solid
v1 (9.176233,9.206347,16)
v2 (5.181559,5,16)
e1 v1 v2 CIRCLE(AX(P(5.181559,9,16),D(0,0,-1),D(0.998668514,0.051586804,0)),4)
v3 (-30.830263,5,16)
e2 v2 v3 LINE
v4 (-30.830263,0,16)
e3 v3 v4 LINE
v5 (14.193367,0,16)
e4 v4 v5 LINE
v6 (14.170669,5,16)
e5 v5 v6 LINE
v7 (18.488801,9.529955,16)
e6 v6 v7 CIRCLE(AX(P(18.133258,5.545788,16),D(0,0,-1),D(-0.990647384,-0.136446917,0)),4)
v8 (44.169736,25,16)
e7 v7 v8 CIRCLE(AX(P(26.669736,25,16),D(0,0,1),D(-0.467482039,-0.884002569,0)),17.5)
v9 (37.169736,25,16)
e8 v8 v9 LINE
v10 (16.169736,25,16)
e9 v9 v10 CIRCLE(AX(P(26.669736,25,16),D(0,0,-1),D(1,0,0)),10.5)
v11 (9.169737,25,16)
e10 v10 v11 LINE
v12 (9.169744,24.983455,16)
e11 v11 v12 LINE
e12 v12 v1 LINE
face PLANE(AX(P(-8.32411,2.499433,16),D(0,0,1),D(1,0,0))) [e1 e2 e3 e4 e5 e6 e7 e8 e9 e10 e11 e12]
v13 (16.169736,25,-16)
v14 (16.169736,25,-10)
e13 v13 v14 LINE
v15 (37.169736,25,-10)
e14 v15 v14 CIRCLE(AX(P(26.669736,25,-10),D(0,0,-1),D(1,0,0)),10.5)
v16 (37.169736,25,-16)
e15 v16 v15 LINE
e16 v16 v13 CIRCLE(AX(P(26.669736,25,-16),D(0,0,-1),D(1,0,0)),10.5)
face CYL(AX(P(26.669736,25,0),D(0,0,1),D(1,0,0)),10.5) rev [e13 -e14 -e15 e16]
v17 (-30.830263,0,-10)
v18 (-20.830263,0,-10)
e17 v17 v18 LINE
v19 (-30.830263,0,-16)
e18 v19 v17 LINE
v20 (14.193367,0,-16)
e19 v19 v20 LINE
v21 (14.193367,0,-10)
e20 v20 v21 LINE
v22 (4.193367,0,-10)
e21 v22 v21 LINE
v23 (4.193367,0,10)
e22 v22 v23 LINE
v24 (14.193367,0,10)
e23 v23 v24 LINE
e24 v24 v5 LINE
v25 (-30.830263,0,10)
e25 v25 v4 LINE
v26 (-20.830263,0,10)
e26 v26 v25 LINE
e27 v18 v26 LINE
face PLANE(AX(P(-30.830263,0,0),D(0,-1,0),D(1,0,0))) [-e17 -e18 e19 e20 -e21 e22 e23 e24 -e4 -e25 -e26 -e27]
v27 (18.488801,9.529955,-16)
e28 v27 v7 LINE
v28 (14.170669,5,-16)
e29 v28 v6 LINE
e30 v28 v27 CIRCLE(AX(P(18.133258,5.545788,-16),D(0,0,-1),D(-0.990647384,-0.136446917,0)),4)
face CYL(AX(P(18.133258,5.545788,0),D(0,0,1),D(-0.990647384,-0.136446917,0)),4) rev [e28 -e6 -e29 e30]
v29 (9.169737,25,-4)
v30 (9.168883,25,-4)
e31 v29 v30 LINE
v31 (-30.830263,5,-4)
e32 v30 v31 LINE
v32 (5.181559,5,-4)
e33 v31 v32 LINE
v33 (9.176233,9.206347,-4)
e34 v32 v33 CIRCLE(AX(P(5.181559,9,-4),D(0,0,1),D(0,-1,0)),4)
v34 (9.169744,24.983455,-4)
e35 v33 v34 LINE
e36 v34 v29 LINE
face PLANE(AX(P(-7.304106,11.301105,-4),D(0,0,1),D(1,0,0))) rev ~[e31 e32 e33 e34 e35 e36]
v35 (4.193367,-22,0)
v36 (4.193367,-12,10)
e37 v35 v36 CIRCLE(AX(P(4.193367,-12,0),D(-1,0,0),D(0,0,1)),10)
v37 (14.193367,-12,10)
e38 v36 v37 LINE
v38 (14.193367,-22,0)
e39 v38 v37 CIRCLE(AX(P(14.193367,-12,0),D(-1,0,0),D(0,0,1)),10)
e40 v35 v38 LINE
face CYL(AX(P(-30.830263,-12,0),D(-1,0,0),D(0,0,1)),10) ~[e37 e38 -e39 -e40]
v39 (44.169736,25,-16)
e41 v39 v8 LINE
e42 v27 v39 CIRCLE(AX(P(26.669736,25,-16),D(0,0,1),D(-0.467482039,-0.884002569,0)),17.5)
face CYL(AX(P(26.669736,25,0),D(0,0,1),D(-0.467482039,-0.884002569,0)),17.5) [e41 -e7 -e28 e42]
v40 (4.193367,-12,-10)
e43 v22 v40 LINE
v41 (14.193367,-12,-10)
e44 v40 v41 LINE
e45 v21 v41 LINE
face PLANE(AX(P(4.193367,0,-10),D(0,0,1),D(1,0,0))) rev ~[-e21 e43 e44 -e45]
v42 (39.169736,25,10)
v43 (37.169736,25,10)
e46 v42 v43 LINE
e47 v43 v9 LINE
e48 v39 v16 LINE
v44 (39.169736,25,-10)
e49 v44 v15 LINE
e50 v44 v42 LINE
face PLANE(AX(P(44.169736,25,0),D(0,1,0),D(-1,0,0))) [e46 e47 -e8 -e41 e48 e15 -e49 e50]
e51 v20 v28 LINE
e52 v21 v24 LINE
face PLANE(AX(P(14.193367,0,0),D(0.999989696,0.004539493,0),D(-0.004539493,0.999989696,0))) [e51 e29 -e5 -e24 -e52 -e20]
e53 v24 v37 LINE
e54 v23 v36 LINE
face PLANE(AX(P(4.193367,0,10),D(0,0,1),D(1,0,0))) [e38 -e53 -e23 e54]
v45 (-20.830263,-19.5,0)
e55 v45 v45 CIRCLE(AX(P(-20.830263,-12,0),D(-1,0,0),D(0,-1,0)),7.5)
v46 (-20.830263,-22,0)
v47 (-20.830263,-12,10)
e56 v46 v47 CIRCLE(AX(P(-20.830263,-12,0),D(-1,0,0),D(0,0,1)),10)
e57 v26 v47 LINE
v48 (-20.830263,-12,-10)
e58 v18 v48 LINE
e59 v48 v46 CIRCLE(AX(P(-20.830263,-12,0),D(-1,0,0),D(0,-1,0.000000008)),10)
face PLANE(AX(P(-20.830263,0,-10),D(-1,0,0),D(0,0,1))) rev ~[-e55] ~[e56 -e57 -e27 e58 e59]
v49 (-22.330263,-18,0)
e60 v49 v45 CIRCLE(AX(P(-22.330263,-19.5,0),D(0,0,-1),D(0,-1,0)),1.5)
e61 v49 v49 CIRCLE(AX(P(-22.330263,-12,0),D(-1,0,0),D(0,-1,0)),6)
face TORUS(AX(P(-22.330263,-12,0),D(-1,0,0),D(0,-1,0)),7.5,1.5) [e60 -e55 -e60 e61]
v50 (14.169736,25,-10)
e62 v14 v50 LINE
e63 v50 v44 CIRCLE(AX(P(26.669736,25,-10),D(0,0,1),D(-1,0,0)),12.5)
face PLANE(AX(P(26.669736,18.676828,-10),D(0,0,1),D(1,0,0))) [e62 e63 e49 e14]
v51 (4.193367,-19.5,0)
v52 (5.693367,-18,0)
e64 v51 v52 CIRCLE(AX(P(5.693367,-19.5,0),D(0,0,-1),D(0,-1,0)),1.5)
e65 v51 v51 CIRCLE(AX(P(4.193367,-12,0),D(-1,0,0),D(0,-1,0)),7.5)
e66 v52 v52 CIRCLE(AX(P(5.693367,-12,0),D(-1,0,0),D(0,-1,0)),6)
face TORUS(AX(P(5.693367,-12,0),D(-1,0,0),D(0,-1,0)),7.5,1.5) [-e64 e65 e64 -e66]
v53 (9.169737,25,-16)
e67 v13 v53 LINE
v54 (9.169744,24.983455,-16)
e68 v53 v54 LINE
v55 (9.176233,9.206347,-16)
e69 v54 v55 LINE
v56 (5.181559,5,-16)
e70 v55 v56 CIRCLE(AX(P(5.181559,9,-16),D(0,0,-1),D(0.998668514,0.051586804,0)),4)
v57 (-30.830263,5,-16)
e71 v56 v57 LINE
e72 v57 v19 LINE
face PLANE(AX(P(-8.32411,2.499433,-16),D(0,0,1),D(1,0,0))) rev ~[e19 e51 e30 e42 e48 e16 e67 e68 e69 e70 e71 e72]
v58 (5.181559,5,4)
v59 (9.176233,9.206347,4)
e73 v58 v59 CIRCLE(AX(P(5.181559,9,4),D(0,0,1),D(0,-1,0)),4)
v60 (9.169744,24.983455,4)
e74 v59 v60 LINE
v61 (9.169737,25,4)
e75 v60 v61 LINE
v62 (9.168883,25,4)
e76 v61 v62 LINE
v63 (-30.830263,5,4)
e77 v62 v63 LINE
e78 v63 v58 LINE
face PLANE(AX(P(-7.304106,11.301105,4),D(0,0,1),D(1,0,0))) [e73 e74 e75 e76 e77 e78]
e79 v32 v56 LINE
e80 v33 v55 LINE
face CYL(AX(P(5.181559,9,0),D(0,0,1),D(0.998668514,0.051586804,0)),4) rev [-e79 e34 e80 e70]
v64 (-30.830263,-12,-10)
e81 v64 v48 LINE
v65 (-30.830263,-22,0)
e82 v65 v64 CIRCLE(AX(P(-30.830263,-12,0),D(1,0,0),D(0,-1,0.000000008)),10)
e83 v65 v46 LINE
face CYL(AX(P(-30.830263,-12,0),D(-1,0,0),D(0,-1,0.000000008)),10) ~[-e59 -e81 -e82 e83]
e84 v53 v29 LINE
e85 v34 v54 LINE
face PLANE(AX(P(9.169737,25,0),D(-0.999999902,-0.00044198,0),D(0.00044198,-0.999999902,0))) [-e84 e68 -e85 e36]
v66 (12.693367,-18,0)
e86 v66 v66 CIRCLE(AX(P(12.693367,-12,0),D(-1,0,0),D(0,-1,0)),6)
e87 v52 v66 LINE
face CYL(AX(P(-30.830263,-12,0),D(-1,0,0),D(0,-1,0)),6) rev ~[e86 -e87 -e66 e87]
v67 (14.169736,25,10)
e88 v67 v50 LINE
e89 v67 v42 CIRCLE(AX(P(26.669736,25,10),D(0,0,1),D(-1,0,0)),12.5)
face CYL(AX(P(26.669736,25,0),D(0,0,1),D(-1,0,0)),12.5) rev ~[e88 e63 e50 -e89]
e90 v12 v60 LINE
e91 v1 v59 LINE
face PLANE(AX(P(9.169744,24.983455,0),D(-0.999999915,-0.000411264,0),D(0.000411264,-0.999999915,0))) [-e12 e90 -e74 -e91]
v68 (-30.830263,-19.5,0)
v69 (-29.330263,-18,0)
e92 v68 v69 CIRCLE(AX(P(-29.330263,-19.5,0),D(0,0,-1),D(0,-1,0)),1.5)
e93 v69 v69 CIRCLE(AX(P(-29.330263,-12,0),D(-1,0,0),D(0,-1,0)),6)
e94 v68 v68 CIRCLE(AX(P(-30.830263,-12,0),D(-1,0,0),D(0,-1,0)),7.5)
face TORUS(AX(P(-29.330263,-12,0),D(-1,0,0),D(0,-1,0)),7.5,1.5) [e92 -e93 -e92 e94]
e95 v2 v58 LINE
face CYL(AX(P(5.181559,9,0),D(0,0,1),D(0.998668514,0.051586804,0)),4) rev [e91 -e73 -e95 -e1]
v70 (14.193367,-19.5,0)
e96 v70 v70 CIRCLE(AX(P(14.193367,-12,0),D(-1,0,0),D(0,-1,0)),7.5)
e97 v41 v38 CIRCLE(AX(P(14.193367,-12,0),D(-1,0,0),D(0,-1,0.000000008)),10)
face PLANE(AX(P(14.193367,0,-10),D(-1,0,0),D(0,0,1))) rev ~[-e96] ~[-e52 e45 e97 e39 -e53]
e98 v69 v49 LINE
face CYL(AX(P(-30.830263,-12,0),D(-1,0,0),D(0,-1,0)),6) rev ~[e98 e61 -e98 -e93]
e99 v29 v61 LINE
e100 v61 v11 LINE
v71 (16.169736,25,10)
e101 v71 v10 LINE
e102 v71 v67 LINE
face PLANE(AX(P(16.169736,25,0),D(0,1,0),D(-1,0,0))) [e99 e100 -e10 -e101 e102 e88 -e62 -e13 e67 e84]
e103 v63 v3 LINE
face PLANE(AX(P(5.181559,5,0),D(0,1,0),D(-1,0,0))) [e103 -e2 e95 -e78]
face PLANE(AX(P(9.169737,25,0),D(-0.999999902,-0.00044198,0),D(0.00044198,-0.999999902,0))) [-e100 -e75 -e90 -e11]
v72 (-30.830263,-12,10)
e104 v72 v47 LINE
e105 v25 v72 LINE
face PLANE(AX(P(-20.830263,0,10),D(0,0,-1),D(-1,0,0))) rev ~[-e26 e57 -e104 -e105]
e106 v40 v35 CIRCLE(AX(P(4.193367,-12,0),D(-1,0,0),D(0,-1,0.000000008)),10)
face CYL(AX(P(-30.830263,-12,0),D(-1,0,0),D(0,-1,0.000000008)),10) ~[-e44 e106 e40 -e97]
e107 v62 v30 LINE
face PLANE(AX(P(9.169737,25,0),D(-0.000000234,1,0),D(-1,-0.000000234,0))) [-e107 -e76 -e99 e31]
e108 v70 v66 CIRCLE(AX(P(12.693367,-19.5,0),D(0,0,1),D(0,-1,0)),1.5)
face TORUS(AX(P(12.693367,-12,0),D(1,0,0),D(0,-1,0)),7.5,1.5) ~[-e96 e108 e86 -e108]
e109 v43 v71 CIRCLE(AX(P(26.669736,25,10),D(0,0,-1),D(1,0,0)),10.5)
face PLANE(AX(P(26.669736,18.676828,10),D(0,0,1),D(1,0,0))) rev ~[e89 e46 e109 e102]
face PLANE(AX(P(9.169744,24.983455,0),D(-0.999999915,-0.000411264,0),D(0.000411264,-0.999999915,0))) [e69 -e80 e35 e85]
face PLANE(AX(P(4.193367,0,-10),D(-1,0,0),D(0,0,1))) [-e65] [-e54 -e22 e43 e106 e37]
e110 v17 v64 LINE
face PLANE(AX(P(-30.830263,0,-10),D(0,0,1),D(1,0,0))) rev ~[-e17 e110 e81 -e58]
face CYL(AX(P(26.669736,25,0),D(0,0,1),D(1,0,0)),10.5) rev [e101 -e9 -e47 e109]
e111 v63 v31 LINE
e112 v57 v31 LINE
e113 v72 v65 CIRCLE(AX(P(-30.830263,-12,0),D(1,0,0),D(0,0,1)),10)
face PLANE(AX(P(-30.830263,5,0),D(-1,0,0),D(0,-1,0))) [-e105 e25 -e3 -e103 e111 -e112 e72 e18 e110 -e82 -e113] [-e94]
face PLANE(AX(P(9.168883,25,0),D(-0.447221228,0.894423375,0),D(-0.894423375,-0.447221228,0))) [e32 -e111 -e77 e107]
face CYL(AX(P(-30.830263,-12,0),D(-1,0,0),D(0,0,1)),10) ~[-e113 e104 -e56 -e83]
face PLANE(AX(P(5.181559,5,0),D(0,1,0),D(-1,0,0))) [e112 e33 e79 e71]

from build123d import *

# Parameters (mm, degrees)
F1_DEPTH = 16
F2_DEPTH = 4
F3_DEPTH = 10
F4_W     = 10
F4_H     = 20
F5_DEPTH = 22
F6_R     = 6
F7_DEPTH = 75.0009999306
F8_R     = 1.5


# Not quite as in the source:
# - ends of sketch curves that miss each other by under 0.0002 mm in the source are joined


with BuildPart() as f1:
    # F0 (on Top) → F1 (new body, symmetric)
    with BuildSketch(Plane.XY):
        Polygon((14.1706688348, 5), (5.1815587922, 5), (-30.8302634659, 5), (-30.8302634659, 0), (14.1933665337, 0), align=None)
        with BuildLine():
            ThreePointArc((9.1762328499, 9.2063472144), (8.0820233117, 6.2454935885), (5.1815587922, 5))
            Line((5.1815587922, 5), (14.1706688348, 5))
            ThreePointArc((14.1706688348, 5), (15.2379483, 8.3057115079), (18.4888007758, 9.5299550339))
            ThreePointArc((18.4888007758, 9.5299550339), (35.6997870029, 10.0097302467), (44.1697364647, 25))
            Line((44.1697364647, 25), (39.1697364647, 25))
            ThreePointArc((39.1697364647, 25), (26.6697364647, 12.5), (14.1697364647, 25))
            Line((14.1697364647, 25), (9.169736973, 25))
            Line((9.169736973, 25), (9.1697442854, 24.9834553538))
            Line((9.1697442854, 24.9834553538), (9.1762328499, 9.2063472144))
        make_face()
        with BuildLine():
            Line((14.1706688348, 25), (14.1697364647, 25))
            ThreePointArc((14.1697364647, 25), (26.6697364647, 12.5), (39.1697364647, 25))
            Line((39.1697364647, 25), (37.1697364647, 25))
            ThreePointArc((37.1697364647, 25), (26.6697364647, 14.5), (16.1697364647, 25))
            Line((16.1697364647, 25), (14.1706688348, 25))
        make_face()
    extrude(amount=F1_DEPTH, both=True)

    # F0 (on Top) → F2 (join, symmetric)
    with BuildSketch(Plane.XY):
        with BuildLine():
            Line((-30.8302634659, 5), (5.1815587922, 5))
            ThreePointArc((5.1815587922, 5), (8.0820233117, 6.2454935885), (9.1762328499, 9.2063472144))
            Line((9.1762328499, 9.2063472144), (9.1697442854, 24.9834553538))
            Line((9.1697442854, 24.9834553538), (9.1697374812, 25.0000000002))
            Line((9.1697374812, 25.0000000002), (9.168883179, 25))
            Line((9.168883179, 25), (-30.8302634659, 5))
        make_face()
    extrude(amount=F2_DEPTH, both=True)

    # F0 (on Top) → F3 (cut, symmetric)
    with BuildSketch(Plane.XY):
        with BuildLine():
            Line((14.1706688348, 25), (14.1697364647, 25))
            ThreePointArc((14.1697364647, 25), (26.6697364647, 12.5), (39.1697364647, 25))
            Line((39.1697364647, 25), (37.1697364647, 25))
            ThreePointArc((37.1697364647, 25), (26.6697364647, 14.5), (16.1697364647, 25))
            Line((16.1697364647, 25), (14.1706688348, 25))
        make_face()
    extrude(amount=F3_DEPTH, both=True, mode=Mode.SUBTRACT)

    # F4 (on face) → F5 (join)
    with BuildSketch(Plane.XZ):
        with Locations((9.1933665337, 0)):
            Rectangle(F4_W, F4_H)
        Polygon((-20.8302634659, 10), (-30.8302634659, 10), (-30.8302634659, 0), (-30.8302634659, -10), (-20.8302634659, -10), align=None)
    extrude(amount=F5_DEPTH)

    # F6 (on face) → F7 (cut, through all)
    with BuildSketch(Plane(origin=(-30.8302634659, 0, 0), x_dir=(0, -1, 0), z_dir=(-1, 0, 0))):
        with BuildLine():
            Line((22, 10), (12, 10))
            ThreePointArc((12, 10), (19.0710677836, 7.0710678402), (22, 8.01e-08))
            Line((22, 8.01e-08), (22, 10))
        make_face()
        with BuildLine():
            Line((22, -10), (22, 8.01e-08))
            ThreePointArc((22, 8.01e-08), (19.0710678402, -7.0710677836), (12, -10))
            Line((12, -10), (22, -10))
        make_face()
        with Locations((12, 0)):
            Circle(F6_R)
    extrude(amount=-F7_DEPTH, mode=Mode.SUBTRACT)

    # F8
    f8_edges = [f1.edges().sort_by_distance(p)[0] for p in [
        (-30.830263, -6, 0),
        (-20.830263, -6, 0),
        (14.193367, -6, 0),
        (4.193367, -6, 0),
    ]]
    fillet(f8_edges, radius=F8_R)


solid = f1.part
